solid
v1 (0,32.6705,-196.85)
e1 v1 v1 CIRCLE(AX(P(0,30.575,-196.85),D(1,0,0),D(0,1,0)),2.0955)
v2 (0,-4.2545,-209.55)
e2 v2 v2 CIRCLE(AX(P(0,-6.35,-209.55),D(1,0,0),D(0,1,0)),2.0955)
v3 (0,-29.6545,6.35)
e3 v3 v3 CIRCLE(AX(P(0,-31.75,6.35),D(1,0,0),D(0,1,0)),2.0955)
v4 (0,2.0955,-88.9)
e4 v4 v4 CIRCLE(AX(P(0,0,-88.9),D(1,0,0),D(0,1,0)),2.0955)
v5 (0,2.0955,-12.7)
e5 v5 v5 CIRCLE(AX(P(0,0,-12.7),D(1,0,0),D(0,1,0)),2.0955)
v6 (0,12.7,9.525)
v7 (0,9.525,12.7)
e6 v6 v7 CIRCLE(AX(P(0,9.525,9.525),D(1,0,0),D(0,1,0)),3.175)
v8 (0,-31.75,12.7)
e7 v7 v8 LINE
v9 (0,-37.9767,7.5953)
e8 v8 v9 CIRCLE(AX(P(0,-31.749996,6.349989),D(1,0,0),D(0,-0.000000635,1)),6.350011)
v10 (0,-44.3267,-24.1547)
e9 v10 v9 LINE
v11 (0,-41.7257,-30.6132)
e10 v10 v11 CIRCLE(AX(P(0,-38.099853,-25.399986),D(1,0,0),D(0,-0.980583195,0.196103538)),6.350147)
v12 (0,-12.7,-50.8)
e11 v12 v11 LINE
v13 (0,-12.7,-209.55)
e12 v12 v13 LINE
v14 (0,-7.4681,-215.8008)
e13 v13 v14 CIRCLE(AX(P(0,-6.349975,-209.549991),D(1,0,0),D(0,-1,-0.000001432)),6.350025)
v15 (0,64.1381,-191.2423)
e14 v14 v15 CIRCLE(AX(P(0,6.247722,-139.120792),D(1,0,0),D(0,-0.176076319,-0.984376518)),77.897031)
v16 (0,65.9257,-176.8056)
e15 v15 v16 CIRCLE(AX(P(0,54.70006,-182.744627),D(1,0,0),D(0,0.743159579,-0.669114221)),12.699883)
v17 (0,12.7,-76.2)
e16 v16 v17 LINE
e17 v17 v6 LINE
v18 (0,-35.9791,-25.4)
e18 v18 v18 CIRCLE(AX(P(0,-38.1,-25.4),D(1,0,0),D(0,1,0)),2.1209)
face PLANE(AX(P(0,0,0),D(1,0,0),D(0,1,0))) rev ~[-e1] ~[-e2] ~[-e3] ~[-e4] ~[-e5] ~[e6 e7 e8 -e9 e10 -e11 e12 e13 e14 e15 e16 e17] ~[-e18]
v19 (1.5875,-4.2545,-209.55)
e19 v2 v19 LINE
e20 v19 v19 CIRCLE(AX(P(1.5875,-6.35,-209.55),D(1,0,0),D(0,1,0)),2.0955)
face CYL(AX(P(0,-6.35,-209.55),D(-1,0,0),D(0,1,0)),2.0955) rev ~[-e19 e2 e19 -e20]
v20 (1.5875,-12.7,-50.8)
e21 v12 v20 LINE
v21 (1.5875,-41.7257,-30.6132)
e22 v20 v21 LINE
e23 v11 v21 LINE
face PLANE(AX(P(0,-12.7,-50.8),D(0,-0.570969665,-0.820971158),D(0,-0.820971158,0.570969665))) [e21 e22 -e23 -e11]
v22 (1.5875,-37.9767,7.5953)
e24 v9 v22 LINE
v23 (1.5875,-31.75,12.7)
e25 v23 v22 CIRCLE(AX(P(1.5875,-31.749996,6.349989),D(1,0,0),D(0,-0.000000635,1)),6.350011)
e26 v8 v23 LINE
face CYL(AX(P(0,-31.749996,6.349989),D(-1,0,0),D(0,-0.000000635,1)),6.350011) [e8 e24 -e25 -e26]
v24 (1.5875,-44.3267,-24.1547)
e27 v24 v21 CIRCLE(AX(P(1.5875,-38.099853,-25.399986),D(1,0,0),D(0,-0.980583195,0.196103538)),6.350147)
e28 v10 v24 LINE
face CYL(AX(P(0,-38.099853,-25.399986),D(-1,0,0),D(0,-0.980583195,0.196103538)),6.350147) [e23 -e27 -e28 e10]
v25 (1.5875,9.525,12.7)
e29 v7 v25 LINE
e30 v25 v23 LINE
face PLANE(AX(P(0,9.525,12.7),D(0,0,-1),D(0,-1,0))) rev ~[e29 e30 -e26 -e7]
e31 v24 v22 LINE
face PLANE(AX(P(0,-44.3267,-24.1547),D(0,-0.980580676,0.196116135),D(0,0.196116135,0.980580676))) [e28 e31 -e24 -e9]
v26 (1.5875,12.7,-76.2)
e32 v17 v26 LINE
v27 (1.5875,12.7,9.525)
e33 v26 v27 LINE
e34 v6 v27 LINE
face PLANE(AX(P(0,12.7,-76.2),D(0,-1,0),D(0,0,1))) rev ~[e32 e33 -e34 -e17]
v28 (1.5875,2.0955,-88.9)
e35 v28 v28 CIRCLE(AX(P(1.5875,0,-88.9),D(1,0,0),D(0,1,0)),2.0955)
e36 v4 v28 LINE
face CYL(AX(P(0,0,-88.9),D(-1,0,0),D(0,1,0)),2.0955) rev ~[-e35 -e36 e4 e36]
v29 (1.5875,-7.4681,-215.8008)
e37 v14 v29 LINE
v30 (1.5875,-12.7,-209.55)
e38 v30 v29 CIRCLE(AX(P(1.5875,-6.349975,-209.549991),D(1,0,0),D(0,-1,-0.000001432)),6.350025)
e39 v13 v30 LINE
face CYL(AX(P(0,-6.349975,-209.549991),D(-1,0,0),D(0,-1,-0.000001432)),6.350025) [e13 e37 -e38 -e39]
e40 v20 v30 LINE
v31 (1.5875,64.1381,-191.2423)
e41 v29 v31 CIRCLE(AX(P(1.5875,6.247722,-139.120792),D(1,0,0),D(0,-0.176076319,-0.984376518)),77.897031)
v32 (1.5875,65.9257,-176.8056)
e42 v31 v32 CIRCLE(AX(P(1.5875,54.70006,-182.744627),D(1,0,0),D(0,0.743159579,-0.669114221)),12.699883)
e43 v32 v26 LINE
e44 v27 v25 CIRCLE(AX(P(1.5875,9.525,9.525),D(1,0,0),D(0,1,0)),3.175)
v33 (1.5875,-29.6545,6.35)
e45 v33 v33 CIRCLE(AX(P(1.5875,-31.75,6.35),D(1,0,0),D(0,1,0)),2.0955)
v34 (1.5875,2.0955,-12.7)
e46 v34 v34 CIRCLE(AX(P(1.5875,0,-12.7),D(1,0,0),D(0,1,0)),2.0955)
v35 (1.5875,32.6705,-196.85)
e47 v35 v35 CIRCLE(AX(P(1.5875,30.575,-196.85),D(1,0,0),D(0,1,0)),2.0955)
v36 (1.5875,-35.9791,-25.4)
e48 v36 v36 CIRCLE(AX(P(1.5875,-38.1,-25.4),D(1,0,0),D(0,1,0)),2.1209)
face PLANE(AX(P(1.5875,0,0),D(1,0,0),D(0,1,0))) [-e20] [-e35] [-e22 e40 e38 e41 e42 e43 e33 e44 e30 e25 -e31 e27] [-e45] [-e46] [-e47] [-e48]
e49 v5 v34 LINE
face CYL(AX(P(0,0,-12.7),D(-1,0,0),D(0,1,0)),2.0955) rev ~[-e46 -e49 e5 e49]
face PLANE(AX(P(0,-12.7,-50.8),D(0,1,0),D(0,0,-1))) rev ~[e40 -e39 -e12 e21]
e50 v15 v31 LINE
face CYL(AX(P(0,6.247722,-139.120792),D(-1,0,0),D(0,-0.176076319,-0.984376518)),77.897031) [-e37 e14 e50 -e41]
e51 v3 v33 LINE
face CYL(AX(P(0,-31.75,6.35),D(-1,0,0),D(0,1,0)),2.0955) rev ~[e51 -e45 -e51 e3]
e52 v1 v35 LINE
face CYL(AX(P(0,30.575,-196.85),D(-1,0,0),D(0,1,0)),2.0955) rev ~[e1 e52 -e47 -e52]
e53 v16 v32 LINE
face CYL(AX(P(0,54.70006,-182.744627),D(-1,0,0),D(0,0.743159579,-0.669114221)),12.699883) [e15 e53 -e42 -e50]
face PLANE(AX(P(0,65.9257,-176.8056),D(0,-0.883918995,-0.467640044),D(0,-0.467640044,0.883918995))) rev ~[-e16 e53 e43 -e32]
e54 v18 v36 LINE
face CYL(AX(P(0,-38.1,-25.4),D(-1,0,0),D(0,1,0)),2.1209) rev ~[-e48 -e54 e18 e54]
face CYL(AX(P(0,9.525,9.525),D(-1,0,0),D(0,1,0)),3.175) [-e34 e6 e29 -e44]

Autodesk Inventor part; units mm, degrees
ref_plane "YZ Plane" through (0, 0, 0) normal (1, 0, 0) x (0, 1, 0)
ref_plane "XZ Plane" through (0, 0, 0) normal (0, 1, 0) x (-1, 0, 0)
ref_plane "XY Plane" through (0, 0, 0) normal (0, 0, 1) x (1, 0, 0)
sketch "main" plane through (0, 0, 0) normal (0, 0, 1) x (1, 0, 0)
  circle A0 centre (-31.9195, -99.4713) radius 2.0955
  arc A1 (-38.2695, -99.4713) -> (-33.0376, -105.722) centre (-31.9195, -99.4713) ccw
  arc A2 (-33.0376, -105.722) -> (38.5686, -81.1636) centre (-19.3218, -29.0418) ccw
  line L0 (40.3562, -66.7269) -> (-12.8695, 33.8787)
  line L1 (-12.8695, 33.8787) -> (-12.8695, 119.6037)
  line L2 (-16.0445, 122.7787) -> (-57.3195, 122.7787)
  line L3 (-38.2695, 59.2787) -> (-38.2695, -99.4713)
  arc A3 (38.5686, -81.1636) -> (40.3562, -66.7269) centre (29.1304, -72.6659) ccw
  circle A4 centre (-25.5695, 21.1787) radius 2.0955
  arc A5 (-12.8695, 119.6037) -> (-16.0445, 122.7787) centre (-16.0445, 119.6037) ccw
  circle A6 centre (5.0055, -86.7713) radius 2.0955
  line L4 (-38.2695, 59.2787) -> (-67.8233, 79.8329)
  circle A7 centre (-63.6695, 84.6787) radius 2.1209
  arc A8 (-69.8962, 85.9241) -> (-67.2952, 79.4656) centre (-63.6695, 84.6787) ccw
  circle A9 centre (-57.3195, 116.4287) radius 2.0955
  arc A10 (-57.3195, 122.7787) -> (-63.5462, 117.6741) centre (-57.3195, 116.4287) ccw
  line L5 (-69.8962, 85.9241) -> (-63.5462, 117.6741)
  circle A11 centre (-25.5695, 97.3787) radius 2.0955
  point P0 (-9.1863, -18.3686)
  point P1 (44.2418, -74.0713)
  dimension "d0" = 4.191
  dimension "d1" = 12.7
  dimension "d3" = 4.191
  dimension "d4" = 3.175
  dimension "d5" = 4.191
  dimension "d12" = 4.2418
  dimension "d14" = 4.191
  dimension "d16" = 158.75
  dimension "d17" = 4.191
sketch "Sketch1" plane through (0, 0, 0) normal (1, 0, 0) x (0, 1, 0)
  circle A0 centre (-6.35, -209.55) radius 2.0955
  arc A1 (-12.7, -209.55) -> (-7.4681, -215.8008) centre (-6.35, -209.55) ccw
  arc A2 (-7.4681, -215.8008) -> (64.1381, -191.2423) centre (6.2477, -139.1205) ccw
  line L0 (65.9257, -176.8056) -> (12.7, -76.2)
  line L1 (12.7, -76.2) -> (12.7, 9.525)
  line L2 (9.525, 12.7) -> (-31.75, 12.7)
  line L3 (-12.7, -50.8) -> (-12.7, -209.55)
  arc A3 (64.1381, -191.2423) -> (65.9257, -176.8056) centre (54.7, -182.7446) ccw
  circle A4 centre (0, -88.9) radius 2.0955
  arc A5 (12.7, 9.525) -> (9.525, 12.7) centre (9.525, 9.525) ccw
  circle A6 centre (30.575, -196.85) radius 2.0955
  line L4 (-12.7, -50.8) -> (-42.2538, -30.2459)
  circle A7 centre (-38.1, -25.4) radius 2.1209
  arc A8 (-44.3267, -24.1547) -> (-41.7257, -30.6132) centre (-38.1, -25.4) ccw
  circle A9 centre (-31.75, 6.35) radius 2.0955
  arc A10 (-31.75, 12.7) -> (-37.9767, 7.5953) centre (-31.75, 6.35) ccw
  line L5 (-44.3267, -24.1547) -> (-37.9767, 7.5953)
  circle A11 centre (0, -12.7) radius 2.0955
  point P0 (0, 0)
extrude "Extrusion1" add sketch "Sketch1" along normal blind 1.5875
equation "\"BendRadius\" = Thickness"
equation "\"BendReliefWidth\" = Thickness"
equation "\"BendReliefDepth\" = 0.5 * Thickness"
equation "\"CornerReliefSize\" = 4 * Thickness"
equation "\"MinimumRemnant\" = 2 * Thickness"
equation "\"TransitionRadius\" = BendRadius"
equation "\"JacobiRadiusSize\" = BendRadius"
equation "\"GapSize\" = Thickness"
equation "\"Thickness\" = 1.5875"
properties part number "gusset" material "Acetal Resin, White"
